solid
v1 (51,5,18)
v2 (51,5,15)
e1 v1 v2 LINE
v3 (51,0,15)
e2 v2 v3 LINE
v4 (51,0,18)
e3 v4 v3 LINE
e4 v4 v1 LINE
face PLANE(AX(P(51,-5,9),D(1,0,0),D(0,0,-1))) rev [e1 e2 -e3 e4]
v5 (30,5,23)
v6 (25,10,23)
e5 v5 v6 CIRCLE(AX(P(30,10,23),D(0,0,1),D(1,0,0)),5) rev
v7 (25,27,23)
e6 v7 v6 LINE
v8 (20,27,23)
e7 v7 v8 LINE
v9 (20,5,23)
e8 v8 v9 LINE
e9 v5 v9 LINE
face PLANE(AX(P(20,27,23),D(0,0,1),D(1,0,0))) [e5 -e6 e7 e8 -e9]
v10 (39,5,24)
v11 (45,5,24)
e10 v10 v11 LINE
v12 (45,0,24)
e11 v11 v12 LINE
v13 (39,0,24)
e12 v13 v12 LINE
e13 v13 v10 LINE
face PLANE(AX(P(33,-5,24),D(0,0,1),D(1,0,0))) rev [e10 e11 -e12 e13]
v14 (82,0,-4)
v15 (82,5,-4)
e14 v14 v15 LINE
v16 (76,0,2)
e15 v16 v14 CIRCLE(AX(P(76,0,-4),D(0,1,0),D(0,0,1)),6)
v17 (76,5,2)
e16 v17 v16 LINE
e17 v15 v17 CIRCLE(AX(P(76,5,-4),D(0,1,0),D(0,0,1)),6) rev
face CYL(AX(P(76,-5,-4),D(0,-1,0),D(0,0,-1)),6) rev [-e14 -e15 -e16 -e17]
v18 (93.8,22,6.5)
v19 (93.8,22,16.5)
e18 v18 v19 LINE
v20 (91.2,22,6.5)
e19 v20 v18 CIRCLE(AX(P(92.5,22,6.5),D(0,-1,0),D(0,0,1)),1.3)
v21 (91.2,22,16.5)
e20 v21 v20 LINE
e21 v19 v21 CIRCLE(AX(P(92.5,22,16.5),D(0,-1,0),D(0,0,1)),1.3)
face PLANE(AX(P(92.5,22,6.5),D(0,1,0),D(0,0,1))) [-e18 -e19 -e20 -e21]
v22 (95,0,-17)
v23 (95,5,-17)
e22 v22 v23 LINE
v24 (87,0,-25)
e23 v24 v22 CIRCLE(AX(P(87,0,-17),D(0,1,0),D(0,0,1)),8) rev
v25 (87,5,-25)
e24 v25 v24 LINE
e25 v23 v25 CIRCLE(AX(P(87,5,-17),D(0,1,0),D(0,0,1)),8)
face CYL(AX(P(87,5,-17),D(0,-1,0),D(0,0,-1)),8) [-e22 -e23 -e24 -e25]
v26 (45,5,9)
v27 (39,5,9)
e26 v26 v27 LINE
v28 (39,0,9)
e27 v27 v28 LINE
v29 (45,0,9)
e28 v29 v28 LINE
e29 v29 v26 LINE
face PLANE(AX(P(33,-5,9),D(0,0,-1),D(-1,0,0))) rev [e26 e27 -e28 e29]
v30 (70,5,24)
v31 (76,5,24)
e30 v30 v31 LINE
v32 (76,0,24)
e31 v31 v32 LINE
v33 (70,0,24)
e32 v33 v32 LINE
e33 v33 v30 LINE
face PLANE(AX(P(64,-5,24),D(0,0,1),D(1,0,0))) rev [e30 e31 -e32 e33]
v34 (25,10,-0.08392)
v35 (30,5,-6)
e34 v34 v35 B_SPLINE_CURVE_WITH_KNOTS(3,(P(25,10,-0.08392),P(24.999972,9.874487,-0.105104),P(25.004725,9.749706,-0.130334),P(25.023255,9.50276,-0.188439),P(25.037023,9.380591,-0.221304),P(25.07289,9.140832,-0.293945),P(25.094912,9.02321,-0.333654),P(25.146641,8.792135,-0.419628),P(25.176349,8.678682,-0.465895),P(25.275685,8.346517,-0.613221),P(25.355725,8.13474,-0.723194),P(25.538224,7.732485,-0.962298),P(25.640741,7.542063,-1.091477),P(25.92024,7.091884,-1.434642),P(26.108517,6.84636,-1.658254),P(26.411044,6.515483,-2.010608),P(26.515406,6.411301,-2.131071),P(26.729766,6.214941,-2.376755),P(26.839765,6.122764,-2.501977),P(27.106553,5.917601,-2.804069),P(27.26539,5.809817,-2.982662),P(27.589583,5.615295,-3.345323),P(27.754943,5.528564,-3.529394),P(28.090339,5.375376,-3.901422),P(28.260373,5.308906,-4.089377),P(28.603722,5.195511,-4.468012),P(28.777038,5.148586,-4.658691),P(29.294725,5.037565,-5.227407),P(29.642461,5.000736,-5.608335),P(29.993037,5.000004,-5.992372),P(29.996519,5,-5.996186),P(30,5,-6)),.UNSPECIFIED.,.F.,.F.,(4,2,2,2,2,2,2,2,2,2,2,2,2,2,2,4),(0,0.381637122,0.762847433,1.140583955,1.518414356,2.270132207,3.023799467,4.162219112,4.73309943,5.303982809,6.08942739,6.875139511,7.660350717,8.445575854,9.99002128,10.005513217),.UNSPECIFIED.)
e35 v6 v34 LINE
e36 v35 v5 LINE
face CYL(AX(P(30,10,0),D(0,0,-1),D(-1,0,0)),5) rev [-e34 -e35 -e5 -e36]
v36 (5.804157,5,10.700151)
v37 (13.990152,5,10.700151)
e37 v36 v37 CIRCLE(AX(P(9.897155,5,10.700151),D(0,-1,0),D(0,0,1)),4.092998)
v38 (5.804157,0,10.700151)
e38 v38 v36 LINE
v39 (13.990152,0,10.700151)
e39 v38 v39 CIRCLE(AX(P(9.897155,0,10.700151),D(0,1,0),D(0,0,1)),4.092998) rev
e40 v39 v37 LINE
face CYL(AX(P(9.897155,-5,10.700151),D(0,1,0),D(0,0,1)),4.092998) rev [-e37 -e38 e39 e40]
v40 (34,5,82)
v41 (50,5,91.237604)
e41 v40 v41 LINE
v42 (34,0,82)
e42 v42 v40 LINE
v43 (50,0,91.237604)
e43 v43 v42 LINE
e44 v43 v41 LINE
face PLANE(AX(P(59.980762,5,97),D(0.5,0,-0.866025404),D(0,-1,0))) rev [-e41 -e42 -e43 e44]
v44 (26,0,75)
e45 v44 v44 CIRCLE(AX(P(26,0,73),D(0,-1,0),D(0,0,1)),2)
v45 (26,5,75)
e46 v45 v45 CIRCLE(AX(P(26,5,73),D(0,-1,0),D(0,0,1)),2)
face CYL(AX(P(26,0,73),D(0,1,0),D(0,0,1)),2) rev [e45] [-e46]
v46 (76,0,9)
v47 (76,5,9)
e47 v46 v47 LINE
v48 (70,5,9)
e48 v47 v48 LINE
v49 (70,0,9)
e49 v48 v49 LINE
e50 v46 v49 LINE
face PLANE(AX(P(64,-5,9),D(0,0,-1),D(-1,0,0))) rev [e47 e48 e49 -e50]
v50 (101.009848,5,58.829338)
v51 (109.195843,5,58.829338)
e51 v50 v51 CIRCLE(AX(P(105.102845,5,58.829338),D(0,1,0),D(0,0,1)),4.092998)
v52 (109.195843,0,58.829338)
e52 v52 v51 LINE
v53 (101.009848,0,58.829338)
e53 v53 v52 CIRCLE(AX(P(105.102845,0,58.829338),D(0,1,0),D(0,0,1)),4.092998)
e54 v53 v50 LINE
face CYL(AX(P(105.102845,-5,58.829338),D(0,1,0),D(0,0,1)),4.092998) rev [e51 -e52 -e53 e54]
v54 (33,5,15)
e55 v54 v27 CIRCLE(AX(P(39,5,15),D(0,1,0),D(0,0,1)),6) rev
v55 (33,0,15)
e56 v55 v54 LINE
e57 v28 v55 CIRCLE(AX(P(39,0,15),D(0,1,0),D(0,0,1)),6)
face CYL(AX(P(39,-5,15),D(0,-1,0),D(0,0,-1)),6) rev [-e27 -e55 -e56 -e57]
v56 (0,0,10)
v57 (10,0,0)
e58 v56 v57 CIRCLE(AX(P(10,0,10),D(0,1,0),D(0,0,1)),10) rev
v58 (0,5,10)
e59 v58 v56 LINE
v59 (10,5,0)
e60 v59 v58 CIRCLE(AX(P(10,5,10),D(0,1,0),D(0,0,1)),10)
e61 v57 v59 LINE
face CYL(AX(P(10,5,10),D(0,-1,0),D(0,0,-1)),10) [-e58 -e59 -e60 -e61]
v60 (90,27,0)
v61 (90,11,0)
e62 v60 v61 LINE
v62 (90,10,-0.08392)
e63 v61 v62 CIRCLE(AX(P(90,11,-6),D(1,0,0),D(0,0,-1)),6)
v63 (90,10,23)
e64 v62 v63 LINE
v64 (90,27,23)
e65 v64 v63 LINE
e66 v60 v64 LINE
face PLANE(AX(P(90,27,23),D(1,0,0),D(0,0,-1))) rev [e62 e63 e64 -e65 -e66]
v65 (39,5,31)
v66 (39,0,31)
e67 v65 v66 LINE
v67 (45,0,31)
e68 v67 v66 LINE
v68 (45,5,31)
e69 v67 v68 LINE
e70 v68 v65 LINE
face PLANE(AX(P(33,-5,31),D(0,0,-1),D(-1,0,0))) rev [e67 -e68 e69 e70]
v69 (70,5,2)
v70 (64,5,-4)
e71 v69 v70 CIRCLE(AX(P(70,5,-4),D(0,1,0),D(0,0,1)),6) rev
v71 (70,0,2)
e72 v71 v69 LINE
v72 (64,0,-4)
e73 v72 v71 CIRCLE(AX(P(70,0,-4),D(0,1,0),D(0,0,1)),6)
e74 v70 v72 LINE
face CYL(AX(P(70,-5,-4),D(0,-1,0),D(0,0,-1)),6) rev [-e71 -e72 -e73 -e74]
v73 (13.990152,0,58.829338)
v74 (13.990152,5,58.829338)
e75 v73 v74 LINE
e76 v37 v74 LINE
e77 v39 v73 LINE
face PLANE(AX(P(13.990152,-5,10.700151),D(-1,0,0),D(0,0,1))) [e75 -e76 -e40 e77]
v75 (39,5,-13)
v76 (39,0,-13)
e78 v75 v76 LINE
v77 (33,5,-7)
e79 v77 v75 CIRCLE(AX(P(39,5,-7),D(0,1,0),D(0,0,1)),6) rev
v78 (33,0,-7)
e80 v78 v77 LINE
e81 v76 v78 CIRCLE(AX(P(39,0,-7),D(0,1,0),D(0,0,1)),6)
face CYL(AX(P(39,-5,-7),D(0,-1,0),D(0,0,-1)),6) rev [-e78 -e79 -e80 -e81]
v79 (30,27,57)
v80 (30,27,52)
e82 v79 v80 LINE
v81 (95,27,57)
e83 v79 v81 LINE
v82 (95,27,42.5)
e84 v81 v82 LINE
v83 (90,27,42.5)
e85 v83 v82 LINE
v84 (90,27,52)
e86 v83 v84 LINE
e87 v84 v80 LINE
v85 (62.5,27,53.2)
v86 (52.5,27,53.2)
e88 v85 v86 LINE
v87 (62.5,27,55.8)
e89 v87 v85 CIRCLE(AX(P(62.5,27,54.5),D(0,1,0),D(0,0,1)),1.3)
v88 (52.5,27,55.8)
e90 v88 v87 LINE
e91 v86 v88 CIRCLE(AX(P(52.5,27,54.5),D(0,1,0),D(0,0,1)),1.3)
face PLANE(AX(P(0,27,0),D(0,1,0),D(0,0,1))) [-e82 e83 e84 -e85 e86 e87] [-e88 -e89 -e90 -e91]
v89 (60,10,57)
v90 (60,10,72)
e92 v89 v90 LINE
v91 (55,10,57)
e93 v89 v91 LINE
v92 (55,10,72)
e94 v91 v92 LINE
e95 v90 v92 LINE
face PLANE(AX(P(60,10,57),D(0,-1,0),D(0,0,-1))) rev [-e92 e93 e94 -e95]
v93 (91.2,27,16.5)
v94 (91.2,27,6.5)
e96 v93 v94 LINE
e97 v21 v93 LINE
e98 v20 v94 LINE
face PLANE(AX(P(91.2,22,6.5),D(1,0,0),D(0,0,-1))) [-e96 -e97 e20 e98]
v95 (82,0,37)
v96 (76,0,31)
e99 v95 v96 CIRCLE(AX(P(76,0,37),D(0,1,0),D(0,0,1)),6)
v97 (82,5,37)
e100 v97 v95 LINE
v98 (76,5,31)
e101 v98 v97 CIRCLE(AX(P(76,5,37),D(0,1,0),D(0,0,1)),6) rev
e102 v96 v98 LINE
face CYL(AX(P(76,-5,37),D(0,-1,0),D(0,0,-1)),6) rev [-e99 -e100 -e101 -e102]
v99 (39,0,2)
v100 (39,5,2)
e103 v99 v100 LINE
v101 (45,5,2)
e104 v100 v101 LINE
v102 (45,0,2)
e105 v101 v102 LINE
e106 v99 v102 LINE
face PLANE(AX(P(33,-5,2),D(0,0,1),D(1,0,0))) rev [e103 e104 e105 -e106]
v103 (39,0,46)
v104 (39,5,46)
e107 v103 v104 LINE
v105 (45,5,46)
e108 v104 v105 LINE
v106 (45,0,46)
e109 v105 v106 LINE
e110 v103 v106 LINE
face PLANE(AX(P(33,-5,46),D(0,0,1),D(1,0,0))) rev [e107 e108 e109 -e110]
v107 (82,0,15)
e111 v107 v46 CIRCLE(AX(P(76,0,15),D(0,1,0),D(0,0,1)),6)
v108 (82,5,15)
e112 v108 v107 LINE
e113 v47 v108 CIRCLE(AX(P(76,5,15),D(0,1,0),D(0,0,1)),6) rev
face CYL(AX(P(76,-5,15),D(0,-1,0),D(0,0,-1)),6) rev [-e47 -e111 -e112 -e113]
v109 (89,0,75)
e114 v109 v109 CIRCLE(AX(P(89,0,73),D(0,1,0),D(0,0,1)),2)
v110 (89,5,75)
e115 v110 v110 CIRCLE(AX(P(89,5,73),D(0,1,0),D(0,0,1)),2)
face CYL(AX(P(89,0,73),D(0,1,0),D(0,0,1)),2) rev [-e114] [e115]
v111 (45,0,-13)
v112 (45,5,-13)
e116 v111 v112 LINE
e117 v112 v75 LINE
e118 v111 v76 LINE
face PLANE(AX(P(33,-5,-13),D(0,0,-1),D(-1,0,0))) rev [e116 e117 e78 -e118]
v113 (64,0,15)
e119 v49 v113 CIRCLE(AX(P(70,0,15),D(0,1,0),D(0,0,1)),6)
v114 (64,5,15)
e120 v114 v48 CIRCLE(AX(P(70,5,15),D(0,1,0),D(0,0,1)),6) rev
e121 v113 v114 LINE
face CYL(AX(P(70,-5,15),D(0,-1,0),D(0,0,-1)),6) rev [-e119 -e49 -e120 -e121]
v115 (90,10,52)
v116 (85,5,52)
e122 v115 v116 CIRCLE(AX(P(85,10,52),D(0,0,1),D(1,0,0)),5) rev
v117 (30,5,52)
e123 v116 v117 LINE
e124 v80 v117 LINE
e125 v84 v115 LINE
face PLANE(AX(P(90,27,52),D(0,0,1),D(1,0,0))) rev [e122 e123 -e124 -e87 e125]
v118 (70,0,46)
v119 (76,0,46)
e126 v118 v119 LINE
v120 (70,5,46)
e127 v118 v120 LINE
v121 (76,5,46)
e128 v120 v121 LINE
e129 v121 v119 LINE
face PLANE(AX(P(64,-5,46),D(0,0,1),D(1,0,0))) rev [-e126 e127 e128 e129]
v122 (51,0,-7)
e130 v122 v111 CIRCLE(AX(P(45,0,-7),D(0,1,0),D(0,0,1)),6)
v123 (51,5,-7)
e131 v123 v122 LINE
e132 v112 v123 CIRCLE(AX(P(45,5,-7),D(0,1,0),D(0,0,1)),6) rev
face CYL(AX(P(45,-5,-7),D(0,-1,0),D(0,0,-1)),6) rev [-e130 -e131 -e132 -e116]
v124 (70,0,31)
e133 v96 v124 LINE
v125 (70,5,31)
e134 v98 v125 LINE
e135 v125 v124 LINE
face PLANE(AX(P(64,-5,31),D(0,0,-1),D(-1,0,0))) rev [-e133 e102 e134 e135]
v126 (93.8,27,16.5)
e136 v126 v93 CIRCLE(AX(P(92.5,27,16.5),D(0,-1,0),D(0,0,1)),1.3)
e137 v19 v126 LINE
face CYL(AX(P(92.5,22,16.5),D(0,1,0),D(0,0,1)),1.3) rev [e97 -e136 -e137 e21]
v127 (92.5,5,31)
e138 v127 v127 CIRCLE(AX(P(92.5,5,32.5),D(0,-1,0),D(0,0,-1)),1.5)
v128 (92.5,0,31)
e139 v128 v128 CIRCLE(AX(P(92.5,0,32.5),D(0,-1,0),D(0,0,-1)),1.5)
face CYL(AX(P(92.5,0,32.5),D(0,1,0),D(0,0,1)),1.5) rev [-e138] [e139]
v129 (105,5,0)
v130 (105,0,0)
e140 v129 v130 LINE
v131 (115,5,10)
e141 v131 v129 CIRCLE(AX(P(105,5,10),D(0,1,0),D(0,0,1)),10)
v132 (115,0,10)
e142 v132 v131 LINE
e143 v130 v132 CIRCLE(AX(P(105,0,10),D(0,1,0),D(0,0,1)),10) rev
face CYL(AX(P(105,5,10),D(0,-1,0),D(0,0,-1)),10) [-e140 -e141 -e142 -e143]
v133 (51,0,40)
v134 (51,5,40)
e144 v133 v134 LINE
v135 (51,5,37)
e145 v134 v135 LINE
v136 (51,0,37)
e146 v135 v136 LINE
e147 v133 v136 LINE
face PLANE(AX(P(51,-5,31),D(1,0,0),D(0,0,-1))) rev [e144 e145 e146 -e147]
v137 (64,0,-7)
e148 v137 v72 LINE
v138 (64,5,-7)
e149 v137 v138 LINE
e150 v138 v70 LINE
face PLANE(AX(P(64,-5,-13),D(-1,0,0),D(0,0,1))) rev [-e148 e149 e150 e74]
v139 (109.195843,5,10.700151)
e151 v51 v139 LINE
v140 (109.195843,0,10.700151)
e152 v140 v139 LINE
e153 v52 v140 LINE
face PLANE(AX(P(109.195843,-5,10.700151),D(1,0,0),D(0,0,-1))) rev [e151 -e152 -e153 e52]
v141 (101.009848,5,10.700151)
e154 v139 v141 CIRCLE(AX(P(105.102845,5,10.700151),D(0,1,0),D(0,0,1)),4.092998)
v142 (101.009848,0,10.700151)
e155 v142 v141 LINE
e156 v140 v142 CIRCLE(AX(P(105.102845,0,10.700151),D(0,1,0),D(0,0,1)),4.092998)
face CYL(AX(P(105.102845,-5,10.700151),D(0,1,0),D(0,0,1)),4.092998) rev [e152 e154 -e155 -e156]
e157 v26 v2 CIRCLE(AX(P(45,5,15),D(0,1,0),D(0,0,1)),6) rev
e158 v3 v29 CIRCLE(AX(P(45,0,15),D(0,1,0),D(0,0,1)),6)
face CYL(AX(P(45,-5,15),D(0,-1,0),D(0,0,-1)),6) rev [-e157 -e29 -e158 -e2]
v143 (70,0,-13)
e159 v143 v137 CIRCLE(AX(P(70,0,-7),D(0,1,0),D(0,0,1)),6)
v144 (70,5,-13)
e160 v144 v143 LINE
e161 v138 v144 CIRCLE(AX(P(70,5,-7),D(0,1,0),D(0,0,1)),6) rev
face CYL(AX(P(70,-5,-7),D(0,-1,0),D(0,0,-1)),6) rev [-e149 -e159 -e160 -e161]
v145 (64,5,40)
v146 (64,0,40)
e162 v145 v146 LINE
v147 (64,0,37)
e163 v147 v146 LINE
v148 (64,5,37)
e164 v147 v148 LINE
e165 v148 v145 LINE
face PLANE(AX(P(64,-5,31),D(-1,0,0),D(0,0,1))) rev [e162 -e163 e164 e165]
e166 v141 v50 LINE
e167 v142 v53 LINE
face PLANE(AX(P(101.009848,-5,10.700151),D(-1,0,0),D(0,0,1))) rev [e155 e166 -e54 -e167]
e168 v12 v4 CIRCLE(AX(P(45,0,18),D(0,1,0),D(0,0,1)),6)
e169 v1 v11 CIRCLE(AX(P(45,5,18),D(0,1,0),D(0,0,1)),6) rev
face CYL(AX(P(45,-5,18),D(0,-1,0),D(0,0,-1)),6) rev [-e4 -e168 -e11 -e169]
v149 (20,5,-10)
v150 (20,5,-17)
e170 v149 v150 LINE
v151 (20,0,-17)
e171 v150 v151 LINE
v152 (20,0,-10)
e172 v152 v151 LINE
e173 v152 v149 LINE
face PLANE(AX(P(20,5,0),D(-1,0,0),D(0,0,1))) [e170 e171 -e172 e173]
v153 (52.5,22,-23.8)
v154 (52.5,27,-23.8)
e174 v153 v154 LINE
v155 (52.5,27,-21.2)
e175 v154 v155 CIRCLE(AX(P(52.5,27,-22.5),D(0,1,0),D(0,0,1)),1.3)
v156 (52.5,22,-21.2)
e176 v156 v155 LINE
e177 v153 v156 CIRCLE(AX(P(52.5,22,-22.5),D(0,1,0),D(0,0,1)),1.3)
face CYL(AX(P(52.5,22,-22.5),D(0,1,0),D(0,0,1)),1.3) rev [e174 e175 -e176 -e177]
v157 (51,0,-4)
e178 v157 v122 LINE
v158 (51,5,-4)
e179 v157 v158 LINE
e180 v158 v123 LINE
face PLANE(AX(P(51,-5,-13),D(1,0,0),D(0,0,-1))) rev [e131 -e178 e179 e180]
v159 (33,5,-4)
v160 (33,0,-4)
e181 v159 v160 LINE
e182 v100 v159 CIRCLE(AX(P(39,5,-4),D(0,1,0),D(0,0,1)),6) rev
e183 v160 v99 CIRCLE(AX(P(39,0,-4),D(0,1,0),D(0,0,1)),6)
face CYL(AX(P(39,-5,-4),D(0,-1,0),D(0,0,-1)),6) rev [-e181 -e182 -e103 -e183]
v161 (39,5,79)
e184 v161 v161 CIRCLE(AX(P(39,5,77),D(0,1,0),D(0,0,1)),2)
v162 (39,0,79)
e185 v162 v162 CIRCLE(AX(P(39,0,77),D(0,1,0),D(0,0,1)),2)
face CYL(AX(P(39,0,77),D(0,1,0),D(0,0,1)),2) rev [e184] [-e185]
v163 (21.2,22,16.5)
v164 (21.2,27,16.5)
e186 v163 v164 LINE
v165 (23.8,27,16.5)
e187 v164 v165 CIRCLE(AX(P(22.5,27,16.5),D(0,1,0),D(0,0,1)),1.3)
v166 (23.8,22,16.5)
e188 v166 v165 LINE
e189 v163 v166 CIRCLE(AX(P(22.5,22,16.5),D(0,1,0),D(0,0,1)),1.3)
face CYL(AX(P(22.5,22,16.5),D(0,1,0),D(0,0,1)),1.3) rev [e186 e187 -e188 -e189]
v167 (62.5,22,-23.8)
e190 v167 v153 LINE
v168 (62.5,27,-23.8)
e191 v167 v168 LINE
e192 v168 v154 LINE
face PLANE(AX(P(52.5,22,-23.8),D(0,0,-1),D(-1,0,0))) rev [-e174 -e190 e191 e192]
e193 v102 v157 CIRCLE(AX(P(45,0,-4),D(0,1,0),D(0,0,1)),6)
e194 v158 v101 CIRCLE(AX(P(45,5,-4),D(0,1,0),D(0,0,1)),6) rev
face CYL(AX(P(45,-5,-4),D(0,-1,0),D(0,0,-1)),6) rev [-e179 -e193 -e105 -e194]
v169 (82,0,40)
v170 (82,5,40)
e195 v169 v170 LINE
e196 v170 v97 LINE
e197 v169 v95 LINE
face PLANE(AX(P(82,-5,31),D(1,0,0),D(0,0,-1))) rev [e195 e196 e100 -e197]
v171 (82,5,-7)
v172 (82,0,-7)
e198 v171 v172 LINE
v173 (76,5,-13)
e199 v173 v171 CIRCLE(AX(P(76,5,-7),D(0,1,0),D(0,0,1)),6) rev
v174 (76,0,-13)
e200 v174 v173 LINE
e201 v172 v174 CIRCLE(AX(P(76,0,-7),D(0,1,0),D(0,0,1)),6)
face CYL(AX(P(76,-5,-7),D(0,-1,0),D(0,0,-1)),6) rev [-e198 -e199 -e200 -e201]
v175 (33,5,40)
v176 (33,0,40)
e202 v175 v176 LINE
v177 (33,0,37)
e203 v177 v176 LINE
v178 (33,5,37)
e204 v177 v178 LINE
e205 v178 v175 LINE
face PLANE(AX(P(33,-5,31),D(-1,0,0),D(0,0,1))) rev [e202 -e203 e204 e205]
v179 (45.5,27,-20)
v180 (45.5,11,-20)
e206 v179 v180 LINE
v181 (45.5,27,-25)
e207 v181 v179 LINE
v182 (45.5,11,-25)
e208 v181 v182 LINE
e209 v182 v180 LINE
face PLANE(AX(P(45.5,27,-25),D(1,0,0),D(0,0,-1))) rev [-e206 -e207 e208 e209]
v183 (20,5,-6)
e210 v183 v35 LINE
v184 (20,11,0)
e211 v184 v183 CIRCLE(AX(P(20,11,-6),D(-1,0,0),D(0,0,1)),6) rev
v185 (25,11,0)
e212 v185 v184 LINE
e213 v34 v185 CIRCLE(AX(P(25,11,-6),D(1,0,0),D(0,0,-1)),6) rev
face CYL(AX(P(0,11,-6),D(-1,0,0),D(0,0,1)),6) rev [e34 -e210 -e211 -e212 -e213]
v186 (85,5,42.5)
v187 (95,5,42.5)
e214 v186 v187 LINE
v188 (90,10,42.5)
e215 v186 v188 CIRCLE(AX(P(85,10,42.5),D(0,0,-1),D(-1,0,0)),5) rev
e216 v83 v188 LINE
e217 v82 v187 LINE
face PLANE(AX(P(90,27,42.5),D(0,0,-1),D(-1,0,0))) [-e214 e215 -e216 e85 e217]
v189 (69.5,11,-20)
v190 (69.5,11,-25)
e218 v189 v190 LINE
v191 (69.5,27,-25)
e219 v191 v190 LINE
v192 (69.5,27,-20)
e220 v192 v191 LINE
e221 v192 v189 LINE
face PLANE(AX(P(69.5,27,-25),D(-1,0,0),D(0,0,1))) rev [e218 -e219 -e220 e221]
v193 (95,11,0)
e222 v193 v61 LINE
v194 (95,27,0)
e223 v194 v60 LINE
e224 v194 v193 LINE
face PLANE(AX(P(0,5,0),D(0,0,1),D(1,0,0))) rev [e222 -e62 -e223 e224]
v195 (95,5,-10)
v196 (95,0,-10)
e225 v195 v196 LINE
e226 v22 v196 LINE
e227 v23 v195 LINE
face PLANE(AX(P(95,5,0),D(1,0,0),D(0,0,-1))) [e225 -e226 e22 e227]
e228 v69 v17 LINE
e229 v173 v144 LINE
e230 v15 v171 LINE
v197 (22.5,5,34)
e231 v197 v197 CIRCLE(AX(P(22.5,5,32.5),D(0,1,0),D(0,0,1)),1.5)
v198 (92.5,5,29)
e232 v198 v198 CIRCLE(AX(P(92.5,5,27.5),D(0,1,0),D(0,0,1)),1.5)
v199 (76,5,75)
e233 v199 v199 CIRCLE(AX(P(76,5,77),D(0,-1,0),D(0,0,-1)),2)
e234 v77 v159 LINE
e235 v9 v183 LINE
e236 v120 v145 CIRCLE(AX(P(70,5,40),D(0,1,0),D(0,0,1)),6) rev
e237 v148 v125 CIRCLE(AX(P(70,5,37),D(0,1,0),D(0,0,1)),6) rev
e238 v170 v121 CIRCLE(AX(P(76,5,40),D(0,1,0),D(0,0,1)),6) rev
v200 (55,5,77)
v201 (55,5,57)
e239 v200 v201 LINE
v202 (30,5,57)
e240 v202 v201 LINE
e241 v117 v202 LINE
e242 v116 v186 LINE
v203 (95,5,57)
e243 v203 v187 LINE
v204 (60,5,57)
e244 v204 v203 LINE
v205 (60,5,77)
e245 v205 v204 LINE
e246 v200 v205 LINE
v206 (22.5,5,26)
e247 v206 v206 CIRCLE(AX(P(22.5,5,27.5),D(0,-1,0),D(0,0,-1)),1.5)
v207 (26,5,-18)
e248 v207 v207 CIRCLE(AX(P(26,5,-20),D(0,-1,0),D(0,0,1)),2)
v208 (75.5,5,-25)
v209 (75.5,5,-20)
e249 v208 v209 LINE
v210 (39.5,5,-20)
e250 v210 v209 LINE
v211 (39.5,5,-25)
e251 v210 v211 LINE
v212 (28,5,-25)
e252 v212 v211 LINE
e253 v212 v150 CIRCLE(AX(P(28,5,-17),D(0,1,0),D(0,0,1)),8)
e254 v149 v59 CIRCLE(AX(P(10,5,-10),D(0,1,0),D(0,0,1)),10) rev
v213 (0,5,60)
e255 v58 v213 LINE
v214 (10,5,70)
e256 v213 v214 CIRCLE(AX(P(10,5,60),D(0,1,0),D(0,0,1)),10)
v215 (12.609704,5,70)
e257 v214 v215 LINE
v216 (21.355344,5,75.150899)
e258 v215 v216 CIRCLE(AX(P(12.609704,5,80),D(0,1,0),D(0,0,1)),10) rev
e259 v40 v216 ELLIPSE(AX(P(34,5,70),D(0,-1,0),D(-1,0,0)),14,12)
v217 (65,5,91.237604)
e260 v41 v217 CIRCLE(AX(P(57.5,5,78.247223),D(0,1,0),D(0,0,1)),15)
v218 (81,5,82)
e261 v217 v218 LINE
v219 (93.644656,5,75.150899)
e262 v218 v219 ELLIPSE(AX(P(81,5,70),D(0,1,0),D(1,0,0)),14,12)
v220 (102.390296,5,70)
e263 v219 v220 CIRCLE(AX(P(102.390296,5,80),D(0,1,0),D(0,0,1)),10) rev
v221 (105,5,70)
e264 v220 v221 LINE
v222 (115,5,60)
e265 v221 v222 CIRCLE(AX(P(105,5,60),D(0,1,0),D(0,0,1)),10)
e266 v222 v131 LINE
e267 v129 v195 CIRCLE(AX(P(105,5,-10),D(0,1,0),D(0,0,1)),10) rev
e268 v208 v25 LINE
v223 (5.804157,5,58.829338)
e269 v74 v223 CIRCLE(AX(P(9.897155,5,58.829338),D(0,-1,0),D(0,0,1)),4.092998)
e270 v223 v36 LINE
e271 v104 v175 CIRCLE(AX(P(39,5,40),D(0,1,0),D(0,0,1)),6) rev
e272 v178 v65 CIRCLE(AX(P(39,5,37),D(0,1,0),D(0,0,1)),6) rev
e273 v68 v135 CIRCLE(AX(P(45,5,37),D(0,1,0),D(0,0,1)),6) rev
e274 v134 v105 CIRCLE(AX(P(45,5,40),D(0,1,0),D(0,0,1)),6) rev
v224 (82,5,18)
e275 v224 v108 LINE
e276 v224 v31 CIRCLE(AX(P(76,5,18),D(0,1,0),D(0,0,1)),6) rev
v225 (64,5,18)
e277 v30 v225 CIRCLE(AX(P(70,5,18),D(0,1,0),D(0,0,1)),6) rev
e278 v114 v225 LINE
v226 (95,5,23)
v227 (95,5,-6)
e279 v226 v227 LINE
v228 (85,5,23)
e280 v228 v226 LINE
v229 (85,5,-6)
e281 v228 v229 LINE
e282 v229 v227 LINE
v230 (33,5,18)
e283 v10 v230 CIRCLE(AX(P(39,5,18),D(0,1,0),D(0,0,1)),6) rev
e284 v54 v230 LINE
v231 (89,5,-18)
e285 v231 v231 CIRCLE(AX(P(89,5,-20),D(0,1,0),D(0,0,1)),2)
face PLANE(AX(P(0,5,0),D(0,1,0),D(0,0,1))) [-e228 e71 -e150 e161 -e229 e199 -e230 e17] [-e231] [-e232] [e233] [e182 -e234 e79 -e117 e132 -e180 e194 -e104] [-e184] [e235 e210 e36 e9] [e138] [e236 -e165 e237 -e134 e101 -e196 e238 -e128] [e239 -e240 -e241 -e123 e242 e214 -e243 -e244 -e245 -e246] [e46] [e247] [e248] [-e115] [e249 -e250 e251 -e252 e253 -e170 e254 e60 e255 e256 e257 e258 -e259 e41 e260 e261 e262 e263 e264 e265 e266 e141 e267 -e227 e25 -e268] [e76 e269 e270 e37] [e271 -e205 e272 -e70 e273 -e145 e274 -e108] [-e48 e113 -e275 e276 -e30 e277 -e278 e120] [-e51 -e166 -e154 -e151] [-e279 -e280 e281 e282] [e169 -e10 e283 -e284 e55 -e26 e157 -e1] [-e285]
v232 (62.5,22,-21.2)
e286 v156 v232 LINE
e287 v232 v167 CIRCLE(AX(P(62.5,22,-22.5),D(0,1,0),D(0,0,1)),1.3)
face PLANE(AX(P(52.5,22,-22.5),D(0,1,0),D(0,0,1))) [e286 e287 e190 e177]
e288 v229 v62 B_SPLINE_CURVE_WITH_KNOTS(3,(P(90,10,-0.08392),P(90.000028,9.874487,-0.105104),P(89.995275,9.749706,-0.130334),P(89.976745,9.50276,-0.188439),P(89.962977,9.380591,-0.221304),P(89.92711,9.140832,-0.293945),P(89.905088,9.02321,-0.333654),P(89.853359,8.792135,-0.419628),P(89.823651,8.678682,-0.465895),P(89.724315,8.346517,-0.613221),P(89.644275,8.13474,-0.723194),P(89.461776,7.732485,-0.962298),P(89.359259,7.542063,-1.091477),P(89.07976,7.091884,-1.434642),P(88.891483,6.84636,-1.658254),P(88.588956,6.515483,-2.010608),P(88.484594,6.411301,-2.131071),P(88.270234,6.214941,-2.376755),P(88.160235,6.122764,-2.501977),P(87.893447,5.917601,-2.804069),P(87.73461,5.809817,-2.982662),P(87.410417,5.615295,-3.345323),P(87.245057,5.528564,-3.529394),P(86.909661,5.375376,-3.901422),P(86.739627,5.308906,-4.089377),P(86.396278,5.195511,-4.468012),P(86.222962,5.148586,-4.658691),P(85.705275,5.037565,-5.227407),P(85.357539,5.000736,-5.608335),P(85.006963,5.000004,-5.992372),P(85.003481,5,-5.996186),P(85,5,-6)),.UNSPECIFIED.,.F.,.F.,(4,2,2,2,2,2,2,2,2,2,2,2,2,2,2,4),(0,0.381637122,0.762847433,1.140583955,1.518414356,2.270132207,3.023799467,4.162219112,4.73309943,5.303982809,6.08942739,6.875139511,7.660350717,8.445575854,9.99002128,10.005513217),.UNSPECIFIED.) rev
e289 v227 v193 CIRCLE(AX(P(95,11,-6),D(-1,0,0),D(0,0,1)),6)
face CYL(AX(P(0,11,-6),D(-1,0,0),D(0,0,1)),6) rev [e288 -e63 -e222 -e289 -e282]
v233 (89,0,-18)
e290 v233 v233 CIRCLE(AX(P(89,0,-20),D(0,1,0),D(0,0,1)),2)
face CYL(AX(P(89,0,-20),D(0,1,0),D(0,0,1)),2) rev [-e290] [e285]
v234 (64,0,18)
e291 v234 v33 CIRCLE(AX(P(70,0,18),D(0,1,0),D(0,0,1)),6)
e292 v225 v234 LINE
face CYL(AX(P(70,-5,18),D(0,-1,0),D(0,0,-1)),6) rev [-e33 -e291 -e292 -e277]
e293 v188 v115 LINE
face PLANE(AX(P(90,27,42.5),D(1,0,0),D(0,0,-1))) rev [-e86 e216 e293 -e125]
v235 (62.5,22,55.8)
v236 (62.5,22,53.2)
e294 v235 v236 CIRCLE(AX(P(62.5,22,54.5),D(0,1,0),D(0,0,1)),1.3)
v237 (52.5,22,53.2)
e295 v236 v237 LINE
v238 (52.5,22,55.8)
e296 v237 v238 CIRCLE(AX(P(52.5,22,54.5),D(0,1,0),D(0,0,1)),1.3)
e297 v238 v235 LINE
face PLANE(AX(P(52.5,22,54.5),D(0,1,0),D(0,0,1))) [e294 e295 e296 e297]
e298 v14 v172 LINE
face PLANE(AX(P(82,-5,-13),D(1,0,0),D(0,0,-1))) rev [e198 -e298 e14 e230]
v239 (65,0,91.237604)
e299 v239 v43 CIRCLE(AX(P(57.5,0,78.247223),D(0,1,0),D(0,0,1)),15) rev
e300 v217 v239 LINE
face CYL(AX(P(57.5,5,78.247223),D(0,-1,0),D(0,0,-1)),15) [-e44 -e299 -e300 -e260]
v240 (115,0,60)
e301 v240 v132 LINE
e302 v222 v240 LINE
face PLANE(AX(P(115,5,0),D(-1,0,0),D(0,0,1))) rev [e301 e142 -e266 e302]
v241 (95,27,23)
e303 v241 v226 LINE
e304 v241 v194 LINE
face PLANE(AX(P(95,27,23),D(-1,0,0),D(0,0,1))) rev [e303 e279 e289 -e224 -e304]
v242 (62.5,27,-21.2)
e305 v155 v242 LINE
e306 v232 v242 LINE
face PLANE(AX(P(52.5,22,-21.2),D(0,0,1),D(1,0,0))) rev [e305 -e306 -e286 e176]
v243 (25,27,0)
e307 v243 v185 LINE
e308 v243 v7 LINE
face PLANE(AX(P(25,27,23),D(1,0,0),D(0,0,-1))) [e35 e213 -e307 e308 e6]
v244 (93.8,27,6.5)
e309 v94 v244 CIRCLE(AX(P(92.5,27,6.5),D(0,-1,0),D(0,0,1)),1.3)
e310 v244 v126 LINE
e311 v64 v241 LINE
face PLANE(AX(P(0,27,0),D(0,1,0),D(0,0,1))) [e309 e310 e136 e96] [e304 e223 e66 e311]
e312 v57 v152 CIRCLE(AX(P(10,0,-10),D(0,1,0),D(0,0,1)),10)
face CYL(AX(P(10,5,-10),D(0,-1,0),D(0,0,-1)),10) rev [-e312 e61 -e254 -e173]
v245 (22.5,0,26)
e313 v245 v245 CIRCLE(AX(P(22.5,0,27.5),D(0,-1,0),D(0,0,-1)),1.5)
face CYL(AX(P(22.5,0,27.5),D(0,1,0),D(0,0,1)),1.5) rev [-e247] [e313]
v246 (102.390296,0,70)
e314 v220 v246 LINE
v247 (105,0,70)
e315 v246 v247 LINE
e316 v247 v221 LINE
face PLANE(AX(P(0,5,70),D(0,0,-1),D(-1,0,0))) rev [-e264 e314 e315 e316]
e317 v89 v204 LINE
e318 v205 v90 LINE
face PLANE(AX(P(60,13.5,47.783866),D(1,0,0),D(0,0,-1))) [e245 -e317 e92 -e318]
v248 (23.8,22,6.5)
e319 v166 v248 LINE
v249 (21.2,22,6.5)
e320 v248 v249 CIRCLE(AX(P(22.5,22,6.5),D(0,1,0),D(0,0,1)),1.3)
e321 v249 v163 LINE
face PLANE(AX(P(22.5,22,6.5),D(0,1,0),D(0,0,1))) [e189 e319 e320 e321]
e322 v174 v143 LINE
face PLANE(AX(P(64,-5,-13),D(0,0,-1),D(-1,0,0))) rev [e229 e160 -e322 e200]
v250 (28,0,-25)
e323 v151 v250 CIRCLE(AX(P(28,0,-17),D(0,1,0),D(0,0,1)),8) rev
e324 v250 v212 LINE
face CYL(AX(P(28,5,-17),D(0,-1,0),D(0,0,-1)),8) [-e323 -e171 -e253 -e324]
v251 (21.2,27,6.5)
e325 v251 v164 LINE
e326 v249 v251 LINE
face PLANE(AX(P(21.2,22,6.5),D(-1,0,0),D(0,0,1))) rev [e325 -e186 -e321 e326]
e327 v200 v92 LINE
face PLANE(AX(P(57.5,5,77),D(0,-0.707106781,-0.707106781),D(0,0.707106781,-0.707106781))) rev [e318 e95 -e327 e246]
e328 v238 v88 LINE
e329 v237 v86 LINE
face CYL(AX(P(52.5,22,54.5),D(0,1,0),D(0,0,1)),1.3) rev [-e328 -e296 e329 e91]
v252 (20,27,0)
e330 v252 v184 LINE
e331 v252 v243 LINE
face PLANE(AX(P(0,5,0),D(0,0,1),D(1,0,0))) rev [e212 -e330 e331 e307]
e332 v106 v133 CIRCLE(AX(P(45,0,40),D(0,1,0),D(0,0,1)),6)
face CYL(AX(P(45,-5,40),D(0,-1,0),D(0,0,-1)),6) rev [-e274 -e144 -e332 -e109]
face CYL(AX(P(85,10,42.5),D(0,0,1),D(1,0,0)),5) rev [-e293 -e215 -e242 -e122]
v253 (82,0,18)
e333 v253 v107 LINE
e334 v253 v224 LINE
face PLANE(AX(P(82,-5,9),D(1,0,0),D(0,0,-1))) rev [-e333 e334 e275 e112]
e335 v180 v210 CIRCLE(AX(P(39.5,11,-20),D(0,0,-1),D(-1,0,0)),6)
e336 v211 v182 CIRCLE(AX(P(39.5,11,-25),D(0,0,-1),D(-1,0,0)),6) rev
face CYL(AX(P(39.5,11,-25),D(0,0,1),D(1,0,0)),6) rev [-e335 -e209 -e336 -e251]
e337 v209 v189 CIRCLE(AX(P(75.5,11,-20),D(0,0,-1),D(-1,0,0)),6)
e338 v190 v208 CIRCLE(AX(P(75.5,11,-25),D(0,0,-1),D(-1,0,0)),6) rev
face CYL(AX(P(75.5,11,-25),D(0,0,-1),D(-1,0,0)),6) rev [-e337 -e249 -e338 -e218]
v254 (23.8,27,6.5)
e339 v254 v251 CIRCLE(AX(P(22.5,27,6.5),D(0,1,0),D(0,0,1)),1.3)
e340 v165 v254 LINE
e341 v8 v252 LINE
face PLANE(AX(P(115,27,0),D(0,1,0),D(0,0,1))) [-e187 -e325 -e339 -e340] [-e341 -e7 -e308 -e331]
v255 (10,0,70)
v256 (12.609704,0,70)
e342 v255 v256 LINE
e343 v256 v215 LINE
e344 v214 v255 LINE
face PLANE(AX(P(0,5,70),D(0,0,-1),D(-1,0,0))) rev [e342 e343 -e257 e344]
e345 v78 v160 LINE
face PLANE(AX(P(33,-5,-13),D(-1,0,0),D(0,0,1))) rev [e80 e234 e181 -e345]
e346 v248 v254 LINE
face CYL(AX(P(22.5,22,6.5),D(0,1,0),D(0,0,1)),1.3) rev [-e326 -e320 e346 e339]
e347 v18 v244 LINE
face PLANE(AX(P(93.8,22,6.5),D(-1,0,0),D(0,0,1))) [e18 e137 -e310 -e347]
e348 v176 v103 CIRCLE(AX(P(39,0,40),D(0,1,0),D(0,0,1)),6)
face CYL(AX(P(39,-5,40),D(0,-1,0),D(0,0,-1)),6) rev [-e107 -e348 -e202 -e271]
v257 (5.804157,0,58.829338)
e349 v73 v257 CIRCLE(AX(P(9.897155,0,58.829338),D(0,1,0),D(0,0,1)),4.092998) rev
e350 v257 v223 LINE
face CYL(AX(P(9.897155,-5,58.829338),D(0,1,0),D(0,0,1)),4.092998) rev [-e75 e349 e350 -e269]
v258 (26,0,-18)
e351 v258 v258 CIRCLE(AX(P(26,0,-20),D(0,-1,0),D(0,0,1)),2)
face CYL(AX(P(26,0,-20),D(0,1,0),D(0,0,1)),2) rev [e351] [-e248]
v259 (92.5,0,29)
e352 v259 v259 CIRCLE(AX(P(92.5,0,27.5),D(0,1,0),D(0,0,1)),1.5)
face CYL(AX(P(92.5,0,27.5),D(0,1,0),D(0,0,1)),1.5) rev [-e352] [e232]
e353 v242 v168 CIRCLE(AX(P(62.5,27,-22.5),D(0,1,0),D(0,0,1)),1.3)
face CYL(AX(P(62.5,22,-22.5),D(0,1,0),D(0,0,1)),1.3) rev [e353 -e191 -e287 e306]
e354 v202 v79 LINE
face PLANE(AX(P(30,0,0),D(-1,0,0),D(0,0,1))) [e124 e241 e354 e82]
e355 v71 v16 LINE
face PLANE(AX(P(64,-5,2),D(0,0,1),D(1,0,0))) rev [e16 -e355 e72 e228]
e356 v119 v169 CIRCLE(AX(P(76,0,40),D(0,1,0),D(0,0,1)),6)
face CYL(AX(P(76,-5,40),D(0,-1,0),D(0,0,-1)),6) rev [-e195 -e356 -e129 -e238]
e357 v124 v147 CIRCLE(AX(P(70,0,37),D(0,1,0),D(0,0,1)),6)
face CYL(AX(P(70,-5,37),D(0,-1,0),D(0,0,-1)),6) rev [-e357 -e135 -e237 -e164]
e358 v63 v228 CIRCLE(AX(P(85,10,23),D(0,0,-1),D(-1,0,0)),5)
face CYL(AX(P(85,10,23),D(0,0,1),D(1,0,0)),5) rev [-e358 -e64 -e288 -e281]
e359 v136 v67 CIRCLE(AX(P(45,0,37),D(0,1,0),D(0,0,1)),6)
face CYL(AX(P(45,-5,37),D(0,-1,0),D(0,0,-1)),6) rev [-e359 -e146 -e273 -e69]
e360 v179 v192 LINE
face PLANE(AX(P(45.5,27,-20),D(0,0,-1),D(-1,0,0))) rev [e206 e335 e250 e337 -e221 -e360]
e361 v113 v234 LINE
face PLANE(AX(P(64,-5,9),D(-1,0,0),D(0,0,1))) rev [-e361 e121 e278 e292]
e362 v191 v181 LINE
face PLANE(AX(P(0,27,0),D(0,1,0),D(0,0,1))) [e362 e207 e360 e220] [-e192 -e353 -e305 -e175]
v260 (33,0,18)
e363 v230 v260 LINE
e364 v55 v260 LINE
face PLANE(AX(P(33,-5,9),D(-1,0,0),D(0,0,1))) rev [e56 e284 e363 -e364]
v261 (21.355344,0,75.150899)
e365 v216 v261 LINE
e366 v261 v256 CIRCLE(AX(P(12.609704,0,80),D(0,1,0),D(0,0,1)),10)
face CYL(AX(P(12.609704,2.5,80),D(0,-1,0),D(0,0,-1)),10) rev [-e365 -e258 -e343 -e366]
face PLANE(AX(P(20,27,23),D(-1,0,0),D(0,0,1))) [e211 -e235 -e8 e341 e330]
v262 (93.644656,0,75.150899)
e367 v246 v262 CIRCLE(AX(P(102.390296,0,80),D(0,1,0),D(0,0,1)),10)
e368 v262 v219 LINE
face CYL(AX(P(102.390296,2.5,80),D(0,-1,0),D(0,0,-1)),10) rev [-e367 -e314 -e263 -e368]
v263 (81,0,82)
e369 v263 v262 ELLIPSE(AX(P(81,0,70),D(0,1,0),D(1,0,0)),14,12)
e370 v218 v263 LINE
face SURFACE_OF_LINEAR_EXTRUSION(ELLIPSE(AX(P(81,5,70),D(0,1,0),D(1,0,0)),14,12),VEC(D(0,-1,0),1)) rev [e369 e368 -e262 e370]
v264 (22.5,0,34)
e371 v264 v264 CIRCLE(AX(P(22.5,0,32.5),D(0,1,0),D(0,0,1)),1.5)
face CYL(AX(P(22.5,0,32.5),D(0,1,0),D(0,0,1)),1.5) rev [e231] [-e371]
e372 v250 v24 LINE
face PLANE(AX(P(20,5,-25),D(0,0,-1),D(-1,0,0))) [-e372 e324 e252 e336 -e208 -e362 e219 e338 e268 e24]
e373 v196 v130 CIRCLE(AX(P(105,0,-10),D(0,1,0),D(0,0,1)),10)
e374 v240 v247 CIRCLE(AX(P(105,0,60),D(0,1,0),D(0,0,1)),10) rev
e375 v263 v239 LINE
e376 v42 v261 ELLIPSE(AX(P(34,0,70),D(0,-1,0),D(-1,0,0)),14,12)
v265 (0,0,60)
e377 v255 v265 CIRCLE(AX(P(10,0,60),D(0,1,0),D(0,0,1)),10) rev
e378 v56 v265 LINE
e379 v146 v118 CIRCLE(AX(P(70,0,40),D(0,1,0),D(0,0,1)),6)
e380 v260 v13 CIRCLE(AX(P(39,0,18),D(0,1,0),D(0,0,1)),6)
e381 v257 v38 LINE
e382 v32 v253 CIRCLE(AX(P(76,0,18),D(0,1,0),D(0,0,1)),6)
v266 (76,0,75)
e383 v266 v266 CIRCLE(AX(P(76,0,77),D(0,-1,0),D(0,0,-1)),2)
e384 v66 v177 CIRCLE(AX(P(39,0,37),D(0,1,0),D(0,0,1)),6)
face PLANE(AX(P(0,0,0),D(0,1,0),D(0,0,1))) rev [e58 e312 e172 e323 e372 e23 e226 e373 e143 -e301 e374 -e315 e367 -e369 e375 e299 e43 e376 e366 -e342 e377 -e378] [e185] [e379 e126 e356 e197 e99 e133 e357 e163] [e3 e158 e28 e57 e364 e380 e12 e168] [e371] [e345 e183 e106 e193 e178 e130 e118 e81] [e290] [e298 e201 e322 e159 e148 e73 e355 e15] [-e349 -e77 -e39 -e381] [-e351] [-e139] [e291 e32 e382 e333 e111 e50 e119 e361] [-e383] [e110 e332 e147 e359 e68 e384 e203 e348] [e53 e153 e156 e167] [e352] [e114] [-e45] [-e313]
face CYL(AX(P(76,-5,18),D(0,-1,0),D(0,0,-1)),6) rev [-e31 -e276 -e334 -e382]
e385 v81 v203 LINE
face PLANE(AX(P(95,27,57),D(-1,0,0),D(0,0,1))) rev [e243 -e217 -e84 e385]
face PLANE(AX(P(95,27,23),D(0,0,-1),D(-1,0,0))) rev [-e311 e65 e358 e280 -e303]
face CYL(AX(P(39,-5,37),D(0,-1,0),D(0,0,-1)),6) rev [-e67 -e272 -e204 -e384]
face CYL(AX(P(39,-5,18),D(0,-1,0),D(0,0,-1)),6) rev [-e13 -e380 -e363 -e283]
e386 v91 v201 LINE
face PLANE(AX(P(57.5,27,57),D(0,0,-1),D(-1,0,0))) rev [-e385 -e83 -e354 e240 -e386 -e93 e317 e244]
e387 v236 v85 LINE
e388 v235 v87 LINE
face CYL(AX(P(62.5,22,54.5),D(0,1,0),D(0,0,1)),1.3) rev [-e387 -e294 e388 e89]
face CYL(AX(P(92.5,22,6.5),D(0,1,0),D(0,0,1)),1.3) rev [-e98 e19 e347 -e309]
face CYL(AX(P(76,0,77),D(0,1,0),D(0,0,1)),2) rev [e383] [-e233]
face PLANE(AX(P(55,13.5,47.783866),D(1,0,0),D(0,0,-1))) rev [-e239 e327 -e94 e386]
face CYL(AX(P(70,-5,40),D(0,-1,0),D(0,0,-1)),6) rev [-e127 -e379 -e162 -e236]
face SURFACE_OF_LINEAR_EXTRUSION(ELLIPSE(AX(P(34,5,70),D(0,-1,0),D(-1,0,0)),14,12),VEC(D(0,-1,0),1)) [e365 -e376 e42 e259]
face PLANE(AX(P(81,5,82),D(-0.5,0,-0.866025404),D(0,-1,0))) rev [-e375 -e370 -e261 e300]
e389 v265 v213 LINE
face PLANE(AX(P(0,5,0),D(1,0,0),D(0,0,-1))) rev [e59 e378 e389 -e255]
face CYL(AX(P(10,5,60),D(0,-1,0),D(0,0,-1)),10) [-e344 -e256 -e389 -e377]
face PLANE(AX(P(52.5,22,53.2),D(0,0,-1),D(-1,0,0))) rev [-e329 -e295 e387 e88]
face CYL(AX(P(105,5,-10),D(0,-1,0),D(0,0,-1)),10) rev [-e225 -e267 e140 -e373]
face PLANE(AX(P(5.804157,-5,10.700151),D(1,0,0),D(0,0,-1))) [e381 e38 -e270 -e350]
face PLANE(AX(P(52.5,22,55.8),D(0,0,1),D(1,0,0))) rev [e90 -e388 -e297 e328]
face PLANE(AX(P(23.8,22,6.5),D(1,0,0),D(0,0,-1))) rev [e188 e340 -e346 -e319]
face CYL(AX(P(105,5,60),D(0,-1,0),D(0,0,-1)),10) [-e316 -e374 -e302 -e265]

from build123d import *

# Parameters (mm, degrees)
SKETCH_1_W           = 115
SKETCH_1_H           = 70
EXTRUDE_1_DEPTH      = 5
SKETCH_2_R           = 1.5
CUT_EXTRUDE_1_DEPTH  = 5
EXTRUDE_3_DEPTH      = 22
SKETCH_4_W           = 5
SKETCH_4_H           = 23
EXTRUDE_4_DEPTH      = 22
SKETCH_6_W           = 47
SKETCH_6_H           = 27
EXTRUDE_5_DEPTH      = 5
SKETCH_7_R           = 2
CUT_EXTRUDE_3_DEPTH  = 5
CHAMFER_1_SIZE       = 15
CHAMFER_1_SIZE_2     = 25.980762114
RIB_1_REACH          = 116.754
SKETCH_8_WALL_W      = 259.791929252
SKETCH_8_WALL_H      = 5
SKETCH_10_W          = 14.5
SKETCH_10_H          = 22
CUT_EXTRUDE_4_DEPTH  = 10
CUT_EXTRUDE_5_DEPTH  = 5
CUT_EXTRUDE_7_DEPTH  = 5
FILLET_1_R           = 15
EXTRUDE_7_DEPTH      = 5
SKETCH_24_W          = 75
SKETCH_24_H          = 25
EXTRUDE_10_DEPTH     = 5
SKETCH_25_R          = 2
CUT_EXTRUDE_9_DEPTH  = 5
SKETCH_26_W          = 24
SKETCH_26_H          = 5
EXTRUDE_11_DEPTH     = 22
FILLET_6_R           = 8
FILLET_START         = -1
FILLET_7_DEPTH       = 7
FILLET_7_2_DEPTH     = 5
SKETCH_28_W          = 18
SKETCH_28_H          = 15
CUT_EXTRUDE_11_DEPTH = 10
FILLET_8_R           = 6
FILLET_9_R           = 6
CUT_EXTRUDE_12_DEPTH = 10
FILLET_10_R          = 6
FILLET_11_R          = 5
CUT_EXTRUDE_13_DEPTH = 5
CUT_EXTRUDE_14_DEPTH = 5


with BuildPart() as part:
    # 草图1 → 凸台-拉伸1 (new body)
    with BuildSketch(Plane(origin=(0, 0, 0), x_dir=(1, 0, 0), z_dir=(0, 1, 0))):
        with Locations((57.5, -35)):
            Rectangle(SKETCH_1_W, SKETCH_1_H)
    extrude(amount=EXTRUDE_1_DEPTH)

    # 草图2 → 切除-拉伸1 (cut)
    with BuildSketch(Plane(origin=(0, 5, 0), x_dir=(1, 0, 0), z_dir=(0, 1, 0))):
        with Locations(Location((92.5, -27.5, 0), (0, 0, 270))):
            Circle(SKETCH_2_R)
        with Locations(Location((92.5, -32.5, 0), (0, 0, 90))):
            Circle(SKETCH_2_R)
        with Locations(Location((22.5, -32.5, 0), (0, 0, 270))):
            Circle(SKETCH_2_R)
        with Locations(Location((22.5, -27.5, 0), (0, 0, 90))):
            Circle(SKETCH_2_R)
    extrude(amount=-CUT_EXTRUDE_1_DEPTH, mode=Mode.SUBTRACT)

    # 草图3 → 凸台-拉伸3 (add)
    with BuildSketch(Plane(origin=(0, 5, 0), x_dir=(1, 0, 0), z_dir=(0, 1, 0))):
        Polygon((90, -42.5), (95, -42.5), (95, -57), (57.5, -57), (57.5, -52), (90, -52), align=None)
    extrude_3 = extrude(amount=EXTRUDE_3_DEPTH)

    # 镜向1: 凸台-拉伸3 across plane
    add(extrude_3.mirror(Plane(origin=(57.5, 27, 52), x_dir=(0, 0, 1), z_dir=(1, 0, 0))))

    # 草图4 → 凸台-拉伸4 (add)
    with BuildSketch(Plane(origin=(0, 5, 0), x_dir=(1, 0, 0), z_dir=(0, 1, 0))):
        with Locations((92.5, -11.5)):
            Rectangle(SKETCH_4_W, SKETCH_4_H)
    extrude_4 = extrude(amount=EXTRUDE_4_DEPTH)

    # 镜向2: 凸台-拉伸4 across plane
    add(extrude_4.mirror(Plane(origin=(57.5, 0, 0), x_dir=(0, 0, 1), z_dir=(1, 0, 0))))

    # 草图6 → 凸台-拉伸5 (add)
    with BuildSketch(Plane.XZ):
        with Locations((57.5, 83.5)):
            Rectangle(SKETCH_6_W, SKETCH_6_H)
    extrude(amount=-EXTRUDE_5_DEPTH)

    # 草图7 → 切除-拉伸3 (cut)
    with BuildSketch(Plane(origin=(0, 5, 0), x_dir=(1, 0, 0), z_dir=(0, 1, 0))):
        with Locations(Location((39, -77, 0), (0, 0, 270))):
            Circle(SKETCH_7_R)
        with Locations(Location((76, -77, 0), (0, 0, 90))):
            Circle(SKETCH_7_R)
    extrude(amount=-CUT_EXTRUDE_3_DEPTH, mode=Mode.SUBTRACT)

    # 倒角1
    # the kernel refuses this chamfer: 25.980762114, 15 mm, written as the material it takes off along each edge
    with BuildSketch(Plane(origin=(81, -67.214459559, 97), x_dir=(0, 0, -1), z_dir=(0, 1, 0))) as chamfer_1_piece_1:
        Polygon((CHAMFER_1_SIZE, 0), (0, CHAMFER_1_SIZE_2), (0, 0), align=None)
    extrude(amount=139.428919118, mode=Mode.SUBTRACT)
    with BuildSketch(Plane(origin=(34, -67.214459559, 97), x_dir=(1, 0, 0), z_dir=(0, 1, 0))) as chamfer_1_piece_2:
        Polygon((CHAMFER_1_SIZE_2, 0), (0, CHAMFER_1_SIZE), (0, 0), align=None)
    extrude(amount=139.428919118, mode=Mode.SUBTRACT)

    # 草图8 wall → 筋1 (add, up to next)
    with BuildSketch(Plane(origin=(57.5, 15, 67), x_dir=(0, 0.707106781187, -0.707106781187), z_dir=(0, 0.707106781187, 0.707106781187)), mode=Mode.PRIVATE) as rib_1_sk1:
        Rectangle(SKETCH_8_WALL_W, SKETCH_8_WALL_H)
    rib_1_tool1 = extrude(rib_1_sk1.sketch, amount=-RIB_1_REACH, mode=Mode.PRIVATE) - part.part
    add(rib_1_tool1.solids().sort_by_distance((57.5, 15, 67))[0])

    # 草图10 → 切除-拉伸4 (cut)
    with BuildSketch(Plane.ZY.offset(-20)):
        with Locations((49.75, 16)):
            Rectangle(SKETCH_10_W, SKETCH_10_H)
    extrude(amount=-CUT_EXTRUDE_4_DEPTH, mode=Mode.SUBTRACT)

    # 草图11 → 切除-拉伸5 (cut)
    with BuildSketch(Plane(origin=(0, 27, 0), x_dir=(1, 0, 0), z_dir=(0, 1, 0))):
        with BuildLine():
            Line((23.8, -6.5), (23.8, -16.5))
            ThreePointArc((23.8, -16.5), (22.5, -17.8), (21.2, -16.5))
            Line((21.2, -16.5), (21.2, -6.5))
            ThreePointArc((21.2, -6.5), (22.5, -5.2), (23.8, -6.5))
        make_face()
    cut_extrude_5 = extrude(amount=-CUT_EXTRUDE_5_DEPTH, mode=Mode.SUBTRACT)

    # 镜向4: 切除-拉伸5 across plane
    add(cut_extrude_5.mirror(Plane(origin=(57.5, 0, 0), x_dir=(0, 0, 1), z_dir=(1, 0, 0))), mode=Mode.SUBTRACT)

    # 草图15 → 切除-拉伸7 (cut)
    with BuildSketch(Plane.ZY.offset(-55)):
        Polygon((57, 25), (57, 10), (72, 10), align=None)
    extrude(amount=-CUT_EXTRUDE_7_DEPTH, mode=Mode.SUBTRACT)

    # 圆角1
    fillet_1_edges = [part.edges().sort_by_distance(p)[0] for p in [
        (57.5, 2.5, 95.567731326),
    ]]
    fillet(fillet_1_edges, radius=FILLET_1_R)

    # 草图18 → 凸台-拉伸7 (add)
    with BuildSketch(Plane.XZ):
        with BuildLine():
            Line((20, 70), (34, 70))
            Line((34, 70), (34, 82))
            add(Edge.make_bspline(
                [(34, 82), (20, 82), (20, 70)],
                knots=[1.570796327, 1.570796327, 1.570796327, 3.141592654, 3.141592654, 3.141592654], degree=2, weights=[1, 0.707106781, 1]))
        make_face()
    extrude_7 = extrude(amount=-EXTRUDE_7_DEPTH)

    # 镜向8: 凸台-拉伸7 across plane
    add(extrude_7.mirror(Plane(origin=(57.5, 0, 0), x_dir=(0, 0, 1), z_dir=(1, 0, 0))))

    # 草图24 → 凸台-拉伸10 (add)
    with BuildSketch(Plane.XZ):
        with Locations((57.5, -12.5)):
            Rectangle(SKETCH_24_W, SKETCH_24_H)
    extrude(amount=-EXTRUDE_10_DEPTH)

    # 草图25 → 切除-拉伸9 (cut)
    with BuildSketch(Plane(origin=(0, 5, 0), x_dir=(1, 0, 0), z_dir=(0, 1, 0))):
        with Locations(Location((89, -73, 0), (0, 0, 270))):
            Circle(SKETCH_25_R)
        with Locations(Location((89, 20, 0), (0, 0, 270))):
            Circle(SKETCH_25_R)
    cut_extrude_9 = extrude(amount=-CUT_EXTRUDE_9_DEPTH, mode=Mode.SUBTRACT)

    # 镜向11: 切除-拉伸9 across plane
    add(cut_extrude_9.mirror(Plane(origin=(57.5, 0, 0), x_dir=(0, 0, 1), z_dir=(1, 0, 0))), mode=Mode.SUBTRACT)

    # 草图26 → 凸台-拉伸11 (add)
    with BuildSketch(Plane(origin=(0, 5, 0), x_dir=(1, 0, 0), z_dir=(0, 1, 0))):
        with Locations((57.5, 22.5)):
            Rectangle(SKETCH_26_W, SKETCH_26_H)
    extrude(amount=EXTRUDE_11_DEPTH)

    # 圆角6
    fillet_6_edges = [part.edges().sort_by_distance(p)[0] for p in [
        (20, 2.5, -25),
        (95, 2.5, -25),
    ]]
    fillet(fillet_6_edges, radius=FILLET_6_R)

    # 圆角7: read off the stored shape, not the designer's step
    # 圆角7 outline → 圆角7 (cut)
    with BuildSketch(Plane(origin=(0, 0, 0), x_dir=(1, 0, 0), z_dir=(0, 1, 0)).offset(FILLET_START)):
        with BuildLine():
            ThreePointArc((105, 0), (112.071067812, -2.928932188), (115, -10))
            Line((115, -10), (115, 0))
            Line((115, 0), (105, 0))
        make_face()
        with BuildLine():
            ThreePointArc((115, -60), (112.071067812, -67.071067812), (105, -70))
            Line((105, -70), (115, -70))
            Line((115, -70), (115, -60))
        make_face()
        with BuildLine():
            Line((0, 0), (0, -10))
            ThreePointArc((0, -10), (2.928932188, -2.928932188), (10, 0))
            Line((10, 0), (0, 0))
        make_face()
        with BuildLine():
            ThreePointArc((10, -70), (2.928932188, -67.071067812), (0, -60))
            Line((0, -60), (0, -70))
            Line((0, -70), (10, -70))
        make_face()
    extrude(amount=FILLET_7_DEPTH, mode=Mode.SUBTRACT)

    # Fillet 7 2 outline → Fillet 7 2 (add)
    with BuildSketch(Plane(origin=(0, 0, 0), x_dir=(1, 0, 0), z_dir=(0, 1, 0))):
        with BuildLine():
            add(Edge.make_bspline(
                [(93.644655928, -75.150899174), (95, -72.706455982), (95, -70)],
                knots=[5.824972497, 5.824972497, 5.824972497, 6.283185307, 6.283185307, 6.283185307], degree=2, weights=[0.878968224, 0.9145609, 1]))
            ThreePointArc((93.644655928, -75.150899174), (97.315407297, -71.383416911), (102.390296052, -70))
            Line((102.390296052, -70), (95, -70))
        make_face()
        with BuildLine():
            Line((95, 0), (105, 0))
            ThreePointArc((105, 0), (97.928932188, 2.928932188), (95, 10))
            Line((95, 10), (95, 0))
        make_face()
        with BuildLine():
            Line((20, -70), (12.609703948, -70))
            ThreePointArc((12.609703948, -70), (17.684592703, -71.383416911), (21.355344072, -75.150899174))
            add(Edge.make_bspline(
                [(21.355344072, -75.150899174), (20, -72.706455982), (20, -70)],
                knots=[5.824972497, 5.824972497, 5.824972497, 6.283185307, 6.283185307, 6.283185307], degree=2, weights=[0.878968224, 0.9145609, 1]))
        make_face()
        with BuildLine():
            ThreePointArc((20, 10), (17.071067812, 2.928932188), (10, 0))
            Line((10, 0), (20, 0))
            Line((20, 0), (20, 10))
        make_face()
    extrude(amount=FILLET_7_2_DEPTH)

    # 草图28 → 切除-拉伸11 (cut)
    with BuildSketch(Plane(origin=(0, 5, 0), x_dir=(1, 0, 0), z_dir=(0, 1, 0))):
        with Locations((42, 5.5)):
            Rectangle(SKETCH_28_W, SKETCH_28_H)
        with Locations((73, 5.5)):
            Rectangle(SKETCH_28_W, SKETCH_28_H)
        with Locations((73, -16.5)):
            Rectangle(SKETCH_28_W, SKETCH_28_H)
        with Locations((73, -38.5)):
            Rectangle(SKETCH_28_W, SKETCH_28_H)
        with Locations((42, -16.5)):
            Rectangle(SKETCH_28_W, SKETCH_28_H)
        with Locations((42, -38.5)):
            Rectangle(SKETCH_28_W, SKETCH_28_H)
    extrude(amount=-CUT_EXTRUDE_11_DEPTH, mode=Mode.SUBTRACT)

    # 圆角8
    fillet_8_edges = [part.edges().sort_by_distance(p)[0] for p in [
        (82, 2.5, 46),
        (64, 2.5, 46),
        (64, 2.5, 31),
        (82, 2.5, 31),
        (82, 2.5, 24),
        (64, 2.5, 24),
        (64, 2.5, 9),
        (82, 2.5, 9),
        (82, 2.5, 2),
        (64, 2.5, 2),
        (64, 2.5, -13),
        (82, 2.5, -13),
    ]]
    fillet(fillet_8_edges, radius=FILLET_8_R)

    # 圆角9
    fillet_9_edges = [part.edges().sort_by_distance(p)[0] for p in [
        (51, 2.5, 24),
        (33, 2.5, 24),
        (33, 2.5, 9),
        (51, 2.5, 9),
        (51, 2.5, 46),
        (33, 2.5, 46),
        (33, 2.5, 31),
        (51, 2.5, 31),
        (51, 2.5, -13),
        (51, 2.5, 2),
        (33, 2.5, 2),
        (33, 2.5, -13),
    ]]
    fillet(fillet_9_edges, radius=FILLET_9_R)

    # 草图29 → 切除-拉伸12 (cut)
    with BuildSketch(Plane(origin=(0, 5, 0), x_dir=(1, 0, 0), z_dir=(0, 1, 0))):
        with BuildLine():
            Line((109.195843091, -10.700151008), (109.195843091, -58.829338195))
            ThreePointArc((109.195843091, -58.829338195), (105.102845499, -62.922335787), (101.009847907, -58.829338195))
            Line((101.009847907, -58.829338195), (101.009847907, -10.700151008))
            ThreePointArc((101.009847907, -10.700151008), (105.102845499, -6.607153417), (109.195843091, -10.700151008))
        make_face()
    cut_extrude_12 = extrude(amount=-CUT_EXTRUDE_12_DEPTH, mode=Mode.SUBTRACT)

    # 镜向16: 切除-拉伸12 across plane
    add(cut_extrude_12.mirror(Plane(origin=(57.5, 0, 0), x_dir=(0, 0, 1), z_dir=(1, 0, 0))), mode=Mode.SUBTRACT)

    # 圆角10
    fillet_10_edges = [part.edges().sort_by_distance(p)[0] for p in [
        (22.5, 5, 0),
        (92.5, 5, 0),
        (69.5, 5, -22.5),
        (45.5, 5, -22.5),
    ]]
    fillet(fillet_10_edges, radius=FILLET_10_R)

    # 圆角11
    fillet_11_edges = [part.edges().sort_by_distance(p)[0] for p in [
        (90, 5, 47.25),
        (90, 5, 8.5),
        (25, 5, 8.5),
    ]]
    fillet(fillet_11_edges, radius=FILLET_11_R)

    # 草图30 → 切除-拉伸13 (cut)
    with BuildSketch(Plane(origin=(0, 27, 0), x_dir=(1, 0, 0), z_dir=(0, 1, 0))):
        with BuildLine():
            Line((52.5, 23.8), (62.5, 23.8))
            ThreePointArc((62.5, 23.8), (63.8, 22.5), (62.5, 21.2))
            Line((62.5, 21.2), (52.5, 21.2))
            ThreePointArc((52.5, 21.2), (51.2, 22.5), (52.5, 23.8))
        make_face()
    extrude(amount=-CUT_EXTRUDE_13_DEPTH, mode=Mode.SUBTRACT)

    # 草图31 → 切除-拉伸14 (cut)
    with BuildSketch(Plane(origin=(0, 27, 0), x_dir=(1, 0, 0), z_dir=(0, 1, 0))):
        with BuildLine():
            Line((52.5, -53.2), (62.5, -53.2))
            ThreePointArc((62.5, -53.2), (63.8, -54.5), (62.5, -55.8))
            Line((62.5, -55.8), (52.5, -55.8))
            ThreePointArc((52.5, -55.8), (51.2, -54.5), (52.5, -53.2))
        make_face()
    extrude(amount=-CUT_EXTRUDE_14_DEPTH, mode=Mode.SUBTRACT)


solid = part.part
